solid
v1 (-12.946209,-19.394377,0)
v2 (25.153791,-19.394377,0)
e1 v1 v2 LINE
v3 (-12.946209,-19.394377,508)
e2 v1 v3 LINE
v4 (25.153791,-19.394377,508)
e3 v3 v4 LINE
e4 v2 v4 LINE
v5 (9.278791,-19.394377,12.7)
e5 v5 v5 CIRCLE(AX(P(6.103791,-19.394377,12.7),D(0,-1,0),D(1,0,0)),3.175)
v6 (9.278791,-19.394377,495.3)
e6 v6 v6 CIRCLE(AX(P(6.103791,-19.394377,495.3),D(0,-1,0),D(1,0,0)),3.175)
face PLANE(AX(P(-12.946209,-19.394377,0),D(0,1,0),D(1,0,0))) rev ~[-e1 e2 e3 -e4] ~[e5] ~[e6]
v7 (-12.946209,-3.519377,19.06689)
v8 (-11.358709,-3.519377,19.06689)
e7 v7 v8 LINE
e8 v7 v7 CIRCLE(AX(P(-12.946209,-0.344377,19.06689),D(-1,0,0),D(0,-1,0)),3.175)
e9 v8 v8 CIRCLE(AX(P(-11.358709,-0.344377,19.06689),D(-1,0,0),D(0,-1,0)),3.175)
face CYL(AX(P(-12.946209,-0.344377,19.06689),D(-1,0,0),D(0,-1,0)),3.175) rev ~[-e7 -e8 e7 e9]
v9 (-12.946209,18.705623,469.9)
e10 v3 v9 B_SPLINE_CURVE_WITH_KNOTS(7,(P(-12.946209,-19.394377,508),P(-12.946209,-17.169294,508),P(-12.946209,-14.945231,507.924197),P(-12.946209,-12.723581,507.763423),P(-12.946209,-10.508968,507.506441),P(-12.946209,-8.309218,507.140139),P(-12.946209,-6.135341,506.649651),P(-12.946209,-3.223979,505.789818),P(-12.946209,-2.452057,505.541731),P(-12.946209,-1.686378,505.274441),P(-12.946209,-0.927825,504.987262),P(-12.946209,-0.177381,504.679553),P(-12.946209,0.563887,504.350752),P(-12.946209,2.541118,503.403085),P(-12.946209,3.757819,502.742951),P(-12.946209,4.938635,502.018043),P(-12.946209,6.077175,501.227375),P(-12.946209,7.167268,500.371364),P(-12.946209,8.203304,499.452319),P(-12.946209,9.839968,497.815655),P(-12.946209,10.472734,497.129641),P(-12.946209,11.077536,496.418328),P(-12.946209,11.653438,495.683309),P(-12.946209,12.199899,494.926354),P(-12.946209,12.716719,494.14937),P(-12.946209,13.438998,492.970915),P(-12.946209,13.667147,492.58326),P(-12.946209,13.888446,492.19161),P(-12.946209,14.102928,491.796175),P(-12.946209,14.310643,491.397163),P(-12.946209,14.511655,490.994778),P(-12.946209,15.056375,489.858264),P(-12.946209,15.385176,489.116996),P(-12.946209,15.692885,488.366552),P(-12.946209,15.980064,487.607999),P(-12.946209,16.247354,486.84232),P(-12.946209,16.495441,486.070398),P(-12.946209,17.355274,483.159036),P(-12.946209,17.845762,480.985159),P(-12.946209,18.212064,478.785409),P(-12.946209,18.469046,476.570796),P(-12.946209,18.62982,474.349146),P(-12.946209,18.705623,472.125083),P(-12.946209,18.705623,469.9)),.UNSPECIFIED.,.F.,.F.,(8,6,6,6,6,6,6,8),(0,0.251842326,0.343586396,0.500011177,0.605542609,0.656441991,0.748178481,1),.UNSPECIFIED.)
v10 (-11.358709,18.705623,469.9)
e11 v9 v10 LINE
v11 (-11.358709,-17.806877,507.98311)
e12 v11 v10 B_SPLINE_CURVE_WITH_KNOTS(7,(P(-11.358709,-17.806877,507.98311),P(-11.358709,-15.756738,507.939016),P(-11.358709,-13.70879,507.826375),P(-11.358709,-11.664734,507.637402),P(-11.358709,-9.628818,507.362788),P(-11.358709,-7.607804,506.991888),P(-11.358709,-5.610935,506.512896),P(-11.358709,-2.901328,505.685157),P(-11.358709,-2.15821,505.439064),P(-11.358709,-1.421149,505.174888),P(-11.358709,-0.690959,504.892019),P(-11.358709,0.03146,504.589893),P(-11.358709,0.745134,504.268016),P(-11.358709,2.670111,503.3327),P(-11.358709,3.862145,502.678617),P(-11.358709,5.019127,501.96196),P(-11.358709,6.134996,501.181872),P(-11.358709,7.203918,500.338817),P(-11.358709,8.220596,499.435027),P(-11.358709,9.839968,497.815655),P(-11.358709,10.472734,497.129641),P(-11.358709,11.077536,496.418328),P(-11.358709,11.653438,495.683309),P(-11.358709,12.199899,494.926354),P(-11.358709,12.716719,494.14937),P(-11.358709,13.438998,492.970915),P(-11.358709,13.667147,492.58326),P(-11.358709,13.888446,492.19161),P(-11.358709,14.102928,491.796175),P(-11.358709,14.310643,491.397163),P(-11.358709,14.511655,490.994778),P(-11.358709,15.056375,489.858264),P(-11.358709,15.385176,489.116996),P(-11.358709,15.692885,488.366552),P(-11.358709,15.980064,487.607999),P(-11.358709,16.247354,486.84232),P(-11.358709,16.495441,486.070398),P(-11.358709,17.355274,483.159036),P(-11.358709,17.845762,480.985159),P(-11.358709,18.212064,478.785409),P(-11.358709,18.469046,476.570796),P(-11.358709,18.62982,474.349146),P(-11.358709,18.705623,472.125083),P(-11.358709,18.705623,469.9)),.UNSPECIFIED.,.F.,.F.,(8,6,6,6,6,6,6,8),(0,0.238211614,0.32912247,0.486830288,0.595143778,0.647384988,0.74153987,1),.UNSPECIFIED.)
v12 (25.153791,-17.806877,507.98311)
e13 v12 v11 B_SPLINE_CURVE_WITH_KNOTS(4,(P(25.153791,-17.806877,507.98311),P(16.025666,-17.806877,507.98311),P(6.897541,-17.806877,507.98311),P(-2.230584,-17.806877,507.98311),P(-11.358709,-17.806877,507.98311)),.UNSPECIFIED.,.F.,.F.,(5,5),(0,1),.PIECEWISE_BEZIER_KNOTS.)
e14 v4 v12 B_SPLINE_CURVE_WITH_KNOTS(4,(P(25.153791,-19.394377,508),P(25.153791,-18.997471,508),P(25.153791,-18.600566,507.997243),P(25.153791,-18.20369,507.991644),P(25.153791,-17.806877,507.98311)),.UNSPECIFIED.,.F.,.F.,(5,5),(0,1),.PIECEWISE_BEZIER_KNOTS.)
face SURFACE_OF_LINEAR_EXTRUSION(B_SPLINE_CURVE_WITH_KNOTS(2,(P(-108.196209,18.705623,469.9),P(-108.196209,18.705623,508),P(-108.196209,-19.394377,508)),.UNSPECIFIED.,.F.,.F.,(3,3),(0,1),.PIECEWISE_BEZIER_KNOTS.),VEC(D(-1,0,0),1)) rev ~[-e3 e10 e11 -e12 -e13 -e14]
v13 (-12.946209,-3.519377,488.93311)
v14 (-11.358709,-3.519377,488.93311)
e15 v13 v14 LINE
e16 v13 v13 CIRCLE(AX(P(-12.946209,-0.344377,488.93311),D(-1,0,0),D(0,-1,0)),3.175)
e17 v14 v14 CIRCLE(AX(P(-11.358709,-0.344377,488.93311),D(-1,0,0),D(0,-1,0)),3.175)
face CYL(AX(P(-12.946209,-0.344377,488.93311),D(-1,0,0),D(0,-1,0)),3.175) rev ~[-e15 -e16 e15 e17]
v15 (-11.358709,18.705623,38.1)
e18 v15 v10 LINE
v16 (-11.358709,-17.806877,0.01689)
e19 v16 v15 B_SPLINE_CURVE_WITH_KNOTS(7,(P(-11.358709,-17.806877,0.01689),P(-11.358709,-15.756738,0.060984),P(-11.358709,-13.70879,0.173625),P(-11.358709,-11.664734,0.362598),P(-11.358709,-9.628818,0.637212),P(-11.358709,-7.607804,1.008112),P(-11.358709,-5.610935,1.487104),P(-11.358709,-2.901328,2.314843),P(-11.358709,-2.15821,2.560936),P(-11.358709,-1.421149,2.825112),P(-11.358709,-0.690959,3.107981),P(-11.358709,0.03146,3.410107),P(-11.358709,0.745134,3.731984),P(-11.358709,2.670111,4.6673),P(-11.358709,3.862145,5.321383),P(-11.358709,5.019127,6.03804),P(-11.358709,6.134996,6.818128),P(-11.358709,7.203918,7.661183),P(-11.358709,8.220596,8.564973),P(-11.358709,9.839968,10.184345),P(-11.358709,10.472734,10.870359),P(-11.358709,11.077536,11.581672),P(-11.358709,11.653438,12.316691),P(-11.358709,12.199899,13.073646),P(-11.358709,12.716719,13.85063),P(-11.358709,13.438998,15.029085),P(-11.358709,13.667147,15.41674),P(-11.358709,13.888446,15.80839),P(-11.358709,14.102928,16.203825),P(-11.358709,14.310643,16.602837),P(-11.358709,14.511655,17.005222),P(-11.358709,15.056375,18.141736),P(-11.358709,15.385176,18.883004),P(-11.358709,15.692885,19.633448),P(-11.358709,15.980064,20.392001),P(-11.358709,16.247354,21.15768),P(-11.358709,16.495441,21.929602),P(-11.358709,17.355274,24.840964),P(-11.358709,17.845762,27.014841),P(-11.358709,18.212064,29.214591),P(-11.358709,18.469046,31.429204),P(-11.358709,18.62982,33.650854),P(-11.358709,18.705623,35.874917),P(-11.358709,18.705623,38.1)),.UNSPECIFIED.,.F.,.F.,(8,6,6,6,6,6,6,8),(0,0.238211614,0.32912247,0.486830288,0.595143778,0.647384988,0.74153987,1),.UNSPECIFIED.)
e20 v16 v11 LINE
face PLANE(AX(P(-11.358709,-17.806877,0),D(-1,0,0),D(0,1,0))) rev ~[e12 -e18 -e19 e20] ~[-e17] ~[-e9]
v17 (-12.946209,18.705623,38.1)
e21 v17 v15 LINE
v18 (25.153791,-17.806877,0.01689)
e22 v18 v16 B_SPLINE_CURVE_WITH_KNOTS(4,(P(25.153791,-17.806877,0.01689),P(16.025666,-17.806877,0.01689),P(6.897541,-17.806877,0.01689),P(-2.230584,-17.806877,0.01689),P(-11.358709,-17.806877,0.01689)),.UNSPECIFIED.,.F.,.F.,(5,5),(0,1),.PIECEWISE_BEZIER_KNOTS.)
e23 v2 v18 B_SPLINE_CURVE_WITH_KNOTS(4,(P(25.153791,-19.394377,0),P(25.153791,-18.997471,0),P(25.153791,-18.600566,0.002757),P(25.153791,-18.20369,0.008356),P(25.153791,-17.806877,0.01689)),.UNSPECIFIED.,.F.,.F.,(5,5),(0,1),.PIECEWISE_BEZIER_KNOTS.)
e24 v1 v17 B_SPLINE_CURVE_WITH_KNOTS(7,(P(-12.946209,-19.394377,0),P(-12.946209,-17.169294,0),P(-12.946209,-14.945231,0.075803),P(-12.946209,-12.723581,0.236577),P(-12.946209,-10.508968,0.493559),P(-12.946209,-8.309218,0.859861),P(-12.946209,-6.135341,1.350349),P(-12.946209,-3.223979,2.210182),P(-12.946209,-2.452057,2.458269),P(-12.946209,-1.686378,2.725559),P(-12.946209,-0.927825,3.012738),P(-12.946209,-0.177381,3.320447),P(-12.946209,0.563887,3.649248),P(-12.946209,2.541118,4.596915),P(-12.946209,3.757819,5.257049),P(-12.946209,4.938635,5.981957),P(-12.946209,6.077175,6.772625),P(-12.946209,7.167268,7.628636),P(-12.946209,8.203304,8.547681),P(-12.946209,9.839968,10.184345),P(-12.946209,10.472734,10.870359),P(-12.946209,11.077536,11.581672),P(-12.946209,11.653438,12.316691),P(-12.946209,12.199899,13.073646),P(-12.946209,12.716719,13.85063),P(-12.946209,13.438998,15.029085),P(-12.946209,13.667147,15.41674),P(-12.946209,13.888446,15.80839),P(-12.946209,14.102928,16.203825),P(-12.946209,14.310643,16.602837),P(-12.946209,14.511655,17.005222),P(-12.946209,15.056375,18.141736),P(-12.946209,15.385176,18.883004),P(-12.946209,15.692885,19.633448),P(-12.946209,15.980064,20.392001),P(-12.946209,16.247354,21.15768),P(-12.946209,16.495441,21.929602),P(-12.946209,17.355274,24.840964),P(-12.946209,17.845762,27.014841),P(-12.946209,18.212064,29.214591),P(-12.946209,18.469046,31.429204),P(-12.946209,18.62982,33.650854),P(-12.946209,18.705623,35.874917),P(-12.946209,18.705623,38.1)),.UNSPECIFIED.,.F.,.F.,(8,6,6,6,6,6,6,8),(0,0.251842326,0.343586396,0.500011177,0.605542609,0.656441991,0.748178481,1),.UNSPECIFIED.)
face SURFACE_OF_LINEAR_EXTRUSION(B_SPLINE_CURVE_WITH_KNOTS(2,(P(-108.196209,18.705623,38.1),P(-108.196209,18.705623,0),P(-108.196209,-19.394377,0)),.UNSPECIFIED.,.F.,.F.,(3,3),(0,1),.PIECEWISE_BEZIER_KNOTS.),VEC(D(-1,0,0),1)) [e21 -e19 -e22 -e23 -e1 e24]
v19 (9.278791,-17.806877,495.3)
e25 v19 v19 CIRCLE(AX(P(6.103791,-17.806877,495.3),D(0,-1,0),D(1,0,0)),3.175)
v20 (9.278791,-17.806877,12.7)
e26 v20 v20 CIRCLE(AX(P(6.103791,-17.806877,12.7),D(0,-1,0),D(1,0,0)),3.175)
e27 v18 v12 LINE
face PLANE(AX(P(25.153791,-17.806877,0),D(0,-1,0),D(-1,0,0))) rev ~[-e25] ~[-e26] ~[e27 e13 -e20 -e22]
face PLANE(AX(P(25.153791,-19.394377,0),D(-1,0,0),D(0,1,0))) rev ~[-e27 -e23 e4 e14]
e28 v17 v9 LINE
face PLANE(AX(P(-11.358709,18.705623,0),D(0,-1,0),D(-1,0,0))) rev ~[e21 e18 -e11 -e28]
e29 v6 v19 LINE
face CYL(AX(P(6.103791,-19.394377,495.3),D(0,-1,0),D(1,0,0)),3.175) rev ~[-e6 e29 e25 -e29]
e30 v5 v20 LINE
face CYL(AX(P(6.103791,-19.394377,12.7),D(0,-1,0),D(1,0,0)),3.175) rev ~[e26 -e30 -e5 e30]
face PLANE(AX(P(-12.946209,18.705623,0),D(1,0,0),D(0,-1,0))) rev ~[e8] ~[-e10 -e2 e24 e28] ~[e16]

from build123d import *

# Parameters (mm, degrees)
F1_DEPTH    = 508
F2_T1_DEPTH = 192.0875
F3_R        = 3.175
F4_DEPTH    = 1.5875
F5_R        = 3.175
F6_DEPTH    = 1.5875


# Not quite as in the source:
# - a fillet or chamfer that OpenCascade refuses, or shapes differently, is made with other operations: its cross-section is extruded or revolved along the edge and cut away or added


with BuildPart() as f1:
    # F0 (on Top) → F1 (new body)
    with BuildSketch(Plane.XY):
        Polygon((-11.3587090754, 18.7056229889), (-12.9462090754, 18.7056229889), (-12.9462090754, -19.3943770111), (25.1537909246, -19.3943770111), (25.1537909246, -17.8068770111), (-11.3587090754, -17.8068770111), align=None)
    extrude(amount=F1_DEPTH)

    # F2: fillet of radius 38.1 on 2 edges, made by hand

    # F2_s2 → F2_t1 (cut)
    with BuildSketch(Plane.YZ.offset(-108.1962090754)):
        with BuildLine():
            add(Edge.make_bspline(
                [(18.7056229889, 469.9), (18.7056229889, 508), (-19.3943770111, 508)],
                knots=[0, 0, 0, 1, 1, 1], degree=2, weights=[1, 1, 1]))
            Line((-19.3943770111, 508), (18.7056229889, 508))
            Line((18.7056229889, 508), (18.7056229889, 469.9))
        make_face()
        with BuildLine():
            add(Edge.make_bspline(
                [(18.7056229889, 38.1), (18.7056229889, 0), (-19.3943770111, 0)],
                knots=[0, 0, 0, 1, 1, 1], degree=2, weights=[1, 1, 1]))
            Line((-19.3943770111, 0), (18.7056229889, 0))
            Line((18.7056229889, 0), (18.7056229889, 38.1))
        make_face()
    extrude(amount=F2_T1_DEPTH, mode=Mode.SUBTRACT)

    # F3 (on face) → F4 (cut)
    with BuildSketch(Plane(origin=(-12.9462090754, 0, 0), x_dir=(0, -1, 0), z_dir=(-1, 0, 0))):
        with Locations((0.3443770111, 488.9331097904)):
            Circle(F3_R)
        with Locations((0.3443770111, 19.0668902096)):
            Circle(F3_R)
    extrude(amount=-F4_DEPTH, mode=Mode.SUBTRACT)

    # F5 (on face) → F6 (cut)
    with BuildSketch(Plane.XZ.offset(19.3943770111)):
        with Locations((6.1037909246, 12.7)):
            Circle(F5_R)
        with Locations((6.1037909246, 495.3)):
            Circle(F5_R)
    extrude(amount=-F6_DEPTH, mode=Mode.SUBTRACT)


solid = f1.part
